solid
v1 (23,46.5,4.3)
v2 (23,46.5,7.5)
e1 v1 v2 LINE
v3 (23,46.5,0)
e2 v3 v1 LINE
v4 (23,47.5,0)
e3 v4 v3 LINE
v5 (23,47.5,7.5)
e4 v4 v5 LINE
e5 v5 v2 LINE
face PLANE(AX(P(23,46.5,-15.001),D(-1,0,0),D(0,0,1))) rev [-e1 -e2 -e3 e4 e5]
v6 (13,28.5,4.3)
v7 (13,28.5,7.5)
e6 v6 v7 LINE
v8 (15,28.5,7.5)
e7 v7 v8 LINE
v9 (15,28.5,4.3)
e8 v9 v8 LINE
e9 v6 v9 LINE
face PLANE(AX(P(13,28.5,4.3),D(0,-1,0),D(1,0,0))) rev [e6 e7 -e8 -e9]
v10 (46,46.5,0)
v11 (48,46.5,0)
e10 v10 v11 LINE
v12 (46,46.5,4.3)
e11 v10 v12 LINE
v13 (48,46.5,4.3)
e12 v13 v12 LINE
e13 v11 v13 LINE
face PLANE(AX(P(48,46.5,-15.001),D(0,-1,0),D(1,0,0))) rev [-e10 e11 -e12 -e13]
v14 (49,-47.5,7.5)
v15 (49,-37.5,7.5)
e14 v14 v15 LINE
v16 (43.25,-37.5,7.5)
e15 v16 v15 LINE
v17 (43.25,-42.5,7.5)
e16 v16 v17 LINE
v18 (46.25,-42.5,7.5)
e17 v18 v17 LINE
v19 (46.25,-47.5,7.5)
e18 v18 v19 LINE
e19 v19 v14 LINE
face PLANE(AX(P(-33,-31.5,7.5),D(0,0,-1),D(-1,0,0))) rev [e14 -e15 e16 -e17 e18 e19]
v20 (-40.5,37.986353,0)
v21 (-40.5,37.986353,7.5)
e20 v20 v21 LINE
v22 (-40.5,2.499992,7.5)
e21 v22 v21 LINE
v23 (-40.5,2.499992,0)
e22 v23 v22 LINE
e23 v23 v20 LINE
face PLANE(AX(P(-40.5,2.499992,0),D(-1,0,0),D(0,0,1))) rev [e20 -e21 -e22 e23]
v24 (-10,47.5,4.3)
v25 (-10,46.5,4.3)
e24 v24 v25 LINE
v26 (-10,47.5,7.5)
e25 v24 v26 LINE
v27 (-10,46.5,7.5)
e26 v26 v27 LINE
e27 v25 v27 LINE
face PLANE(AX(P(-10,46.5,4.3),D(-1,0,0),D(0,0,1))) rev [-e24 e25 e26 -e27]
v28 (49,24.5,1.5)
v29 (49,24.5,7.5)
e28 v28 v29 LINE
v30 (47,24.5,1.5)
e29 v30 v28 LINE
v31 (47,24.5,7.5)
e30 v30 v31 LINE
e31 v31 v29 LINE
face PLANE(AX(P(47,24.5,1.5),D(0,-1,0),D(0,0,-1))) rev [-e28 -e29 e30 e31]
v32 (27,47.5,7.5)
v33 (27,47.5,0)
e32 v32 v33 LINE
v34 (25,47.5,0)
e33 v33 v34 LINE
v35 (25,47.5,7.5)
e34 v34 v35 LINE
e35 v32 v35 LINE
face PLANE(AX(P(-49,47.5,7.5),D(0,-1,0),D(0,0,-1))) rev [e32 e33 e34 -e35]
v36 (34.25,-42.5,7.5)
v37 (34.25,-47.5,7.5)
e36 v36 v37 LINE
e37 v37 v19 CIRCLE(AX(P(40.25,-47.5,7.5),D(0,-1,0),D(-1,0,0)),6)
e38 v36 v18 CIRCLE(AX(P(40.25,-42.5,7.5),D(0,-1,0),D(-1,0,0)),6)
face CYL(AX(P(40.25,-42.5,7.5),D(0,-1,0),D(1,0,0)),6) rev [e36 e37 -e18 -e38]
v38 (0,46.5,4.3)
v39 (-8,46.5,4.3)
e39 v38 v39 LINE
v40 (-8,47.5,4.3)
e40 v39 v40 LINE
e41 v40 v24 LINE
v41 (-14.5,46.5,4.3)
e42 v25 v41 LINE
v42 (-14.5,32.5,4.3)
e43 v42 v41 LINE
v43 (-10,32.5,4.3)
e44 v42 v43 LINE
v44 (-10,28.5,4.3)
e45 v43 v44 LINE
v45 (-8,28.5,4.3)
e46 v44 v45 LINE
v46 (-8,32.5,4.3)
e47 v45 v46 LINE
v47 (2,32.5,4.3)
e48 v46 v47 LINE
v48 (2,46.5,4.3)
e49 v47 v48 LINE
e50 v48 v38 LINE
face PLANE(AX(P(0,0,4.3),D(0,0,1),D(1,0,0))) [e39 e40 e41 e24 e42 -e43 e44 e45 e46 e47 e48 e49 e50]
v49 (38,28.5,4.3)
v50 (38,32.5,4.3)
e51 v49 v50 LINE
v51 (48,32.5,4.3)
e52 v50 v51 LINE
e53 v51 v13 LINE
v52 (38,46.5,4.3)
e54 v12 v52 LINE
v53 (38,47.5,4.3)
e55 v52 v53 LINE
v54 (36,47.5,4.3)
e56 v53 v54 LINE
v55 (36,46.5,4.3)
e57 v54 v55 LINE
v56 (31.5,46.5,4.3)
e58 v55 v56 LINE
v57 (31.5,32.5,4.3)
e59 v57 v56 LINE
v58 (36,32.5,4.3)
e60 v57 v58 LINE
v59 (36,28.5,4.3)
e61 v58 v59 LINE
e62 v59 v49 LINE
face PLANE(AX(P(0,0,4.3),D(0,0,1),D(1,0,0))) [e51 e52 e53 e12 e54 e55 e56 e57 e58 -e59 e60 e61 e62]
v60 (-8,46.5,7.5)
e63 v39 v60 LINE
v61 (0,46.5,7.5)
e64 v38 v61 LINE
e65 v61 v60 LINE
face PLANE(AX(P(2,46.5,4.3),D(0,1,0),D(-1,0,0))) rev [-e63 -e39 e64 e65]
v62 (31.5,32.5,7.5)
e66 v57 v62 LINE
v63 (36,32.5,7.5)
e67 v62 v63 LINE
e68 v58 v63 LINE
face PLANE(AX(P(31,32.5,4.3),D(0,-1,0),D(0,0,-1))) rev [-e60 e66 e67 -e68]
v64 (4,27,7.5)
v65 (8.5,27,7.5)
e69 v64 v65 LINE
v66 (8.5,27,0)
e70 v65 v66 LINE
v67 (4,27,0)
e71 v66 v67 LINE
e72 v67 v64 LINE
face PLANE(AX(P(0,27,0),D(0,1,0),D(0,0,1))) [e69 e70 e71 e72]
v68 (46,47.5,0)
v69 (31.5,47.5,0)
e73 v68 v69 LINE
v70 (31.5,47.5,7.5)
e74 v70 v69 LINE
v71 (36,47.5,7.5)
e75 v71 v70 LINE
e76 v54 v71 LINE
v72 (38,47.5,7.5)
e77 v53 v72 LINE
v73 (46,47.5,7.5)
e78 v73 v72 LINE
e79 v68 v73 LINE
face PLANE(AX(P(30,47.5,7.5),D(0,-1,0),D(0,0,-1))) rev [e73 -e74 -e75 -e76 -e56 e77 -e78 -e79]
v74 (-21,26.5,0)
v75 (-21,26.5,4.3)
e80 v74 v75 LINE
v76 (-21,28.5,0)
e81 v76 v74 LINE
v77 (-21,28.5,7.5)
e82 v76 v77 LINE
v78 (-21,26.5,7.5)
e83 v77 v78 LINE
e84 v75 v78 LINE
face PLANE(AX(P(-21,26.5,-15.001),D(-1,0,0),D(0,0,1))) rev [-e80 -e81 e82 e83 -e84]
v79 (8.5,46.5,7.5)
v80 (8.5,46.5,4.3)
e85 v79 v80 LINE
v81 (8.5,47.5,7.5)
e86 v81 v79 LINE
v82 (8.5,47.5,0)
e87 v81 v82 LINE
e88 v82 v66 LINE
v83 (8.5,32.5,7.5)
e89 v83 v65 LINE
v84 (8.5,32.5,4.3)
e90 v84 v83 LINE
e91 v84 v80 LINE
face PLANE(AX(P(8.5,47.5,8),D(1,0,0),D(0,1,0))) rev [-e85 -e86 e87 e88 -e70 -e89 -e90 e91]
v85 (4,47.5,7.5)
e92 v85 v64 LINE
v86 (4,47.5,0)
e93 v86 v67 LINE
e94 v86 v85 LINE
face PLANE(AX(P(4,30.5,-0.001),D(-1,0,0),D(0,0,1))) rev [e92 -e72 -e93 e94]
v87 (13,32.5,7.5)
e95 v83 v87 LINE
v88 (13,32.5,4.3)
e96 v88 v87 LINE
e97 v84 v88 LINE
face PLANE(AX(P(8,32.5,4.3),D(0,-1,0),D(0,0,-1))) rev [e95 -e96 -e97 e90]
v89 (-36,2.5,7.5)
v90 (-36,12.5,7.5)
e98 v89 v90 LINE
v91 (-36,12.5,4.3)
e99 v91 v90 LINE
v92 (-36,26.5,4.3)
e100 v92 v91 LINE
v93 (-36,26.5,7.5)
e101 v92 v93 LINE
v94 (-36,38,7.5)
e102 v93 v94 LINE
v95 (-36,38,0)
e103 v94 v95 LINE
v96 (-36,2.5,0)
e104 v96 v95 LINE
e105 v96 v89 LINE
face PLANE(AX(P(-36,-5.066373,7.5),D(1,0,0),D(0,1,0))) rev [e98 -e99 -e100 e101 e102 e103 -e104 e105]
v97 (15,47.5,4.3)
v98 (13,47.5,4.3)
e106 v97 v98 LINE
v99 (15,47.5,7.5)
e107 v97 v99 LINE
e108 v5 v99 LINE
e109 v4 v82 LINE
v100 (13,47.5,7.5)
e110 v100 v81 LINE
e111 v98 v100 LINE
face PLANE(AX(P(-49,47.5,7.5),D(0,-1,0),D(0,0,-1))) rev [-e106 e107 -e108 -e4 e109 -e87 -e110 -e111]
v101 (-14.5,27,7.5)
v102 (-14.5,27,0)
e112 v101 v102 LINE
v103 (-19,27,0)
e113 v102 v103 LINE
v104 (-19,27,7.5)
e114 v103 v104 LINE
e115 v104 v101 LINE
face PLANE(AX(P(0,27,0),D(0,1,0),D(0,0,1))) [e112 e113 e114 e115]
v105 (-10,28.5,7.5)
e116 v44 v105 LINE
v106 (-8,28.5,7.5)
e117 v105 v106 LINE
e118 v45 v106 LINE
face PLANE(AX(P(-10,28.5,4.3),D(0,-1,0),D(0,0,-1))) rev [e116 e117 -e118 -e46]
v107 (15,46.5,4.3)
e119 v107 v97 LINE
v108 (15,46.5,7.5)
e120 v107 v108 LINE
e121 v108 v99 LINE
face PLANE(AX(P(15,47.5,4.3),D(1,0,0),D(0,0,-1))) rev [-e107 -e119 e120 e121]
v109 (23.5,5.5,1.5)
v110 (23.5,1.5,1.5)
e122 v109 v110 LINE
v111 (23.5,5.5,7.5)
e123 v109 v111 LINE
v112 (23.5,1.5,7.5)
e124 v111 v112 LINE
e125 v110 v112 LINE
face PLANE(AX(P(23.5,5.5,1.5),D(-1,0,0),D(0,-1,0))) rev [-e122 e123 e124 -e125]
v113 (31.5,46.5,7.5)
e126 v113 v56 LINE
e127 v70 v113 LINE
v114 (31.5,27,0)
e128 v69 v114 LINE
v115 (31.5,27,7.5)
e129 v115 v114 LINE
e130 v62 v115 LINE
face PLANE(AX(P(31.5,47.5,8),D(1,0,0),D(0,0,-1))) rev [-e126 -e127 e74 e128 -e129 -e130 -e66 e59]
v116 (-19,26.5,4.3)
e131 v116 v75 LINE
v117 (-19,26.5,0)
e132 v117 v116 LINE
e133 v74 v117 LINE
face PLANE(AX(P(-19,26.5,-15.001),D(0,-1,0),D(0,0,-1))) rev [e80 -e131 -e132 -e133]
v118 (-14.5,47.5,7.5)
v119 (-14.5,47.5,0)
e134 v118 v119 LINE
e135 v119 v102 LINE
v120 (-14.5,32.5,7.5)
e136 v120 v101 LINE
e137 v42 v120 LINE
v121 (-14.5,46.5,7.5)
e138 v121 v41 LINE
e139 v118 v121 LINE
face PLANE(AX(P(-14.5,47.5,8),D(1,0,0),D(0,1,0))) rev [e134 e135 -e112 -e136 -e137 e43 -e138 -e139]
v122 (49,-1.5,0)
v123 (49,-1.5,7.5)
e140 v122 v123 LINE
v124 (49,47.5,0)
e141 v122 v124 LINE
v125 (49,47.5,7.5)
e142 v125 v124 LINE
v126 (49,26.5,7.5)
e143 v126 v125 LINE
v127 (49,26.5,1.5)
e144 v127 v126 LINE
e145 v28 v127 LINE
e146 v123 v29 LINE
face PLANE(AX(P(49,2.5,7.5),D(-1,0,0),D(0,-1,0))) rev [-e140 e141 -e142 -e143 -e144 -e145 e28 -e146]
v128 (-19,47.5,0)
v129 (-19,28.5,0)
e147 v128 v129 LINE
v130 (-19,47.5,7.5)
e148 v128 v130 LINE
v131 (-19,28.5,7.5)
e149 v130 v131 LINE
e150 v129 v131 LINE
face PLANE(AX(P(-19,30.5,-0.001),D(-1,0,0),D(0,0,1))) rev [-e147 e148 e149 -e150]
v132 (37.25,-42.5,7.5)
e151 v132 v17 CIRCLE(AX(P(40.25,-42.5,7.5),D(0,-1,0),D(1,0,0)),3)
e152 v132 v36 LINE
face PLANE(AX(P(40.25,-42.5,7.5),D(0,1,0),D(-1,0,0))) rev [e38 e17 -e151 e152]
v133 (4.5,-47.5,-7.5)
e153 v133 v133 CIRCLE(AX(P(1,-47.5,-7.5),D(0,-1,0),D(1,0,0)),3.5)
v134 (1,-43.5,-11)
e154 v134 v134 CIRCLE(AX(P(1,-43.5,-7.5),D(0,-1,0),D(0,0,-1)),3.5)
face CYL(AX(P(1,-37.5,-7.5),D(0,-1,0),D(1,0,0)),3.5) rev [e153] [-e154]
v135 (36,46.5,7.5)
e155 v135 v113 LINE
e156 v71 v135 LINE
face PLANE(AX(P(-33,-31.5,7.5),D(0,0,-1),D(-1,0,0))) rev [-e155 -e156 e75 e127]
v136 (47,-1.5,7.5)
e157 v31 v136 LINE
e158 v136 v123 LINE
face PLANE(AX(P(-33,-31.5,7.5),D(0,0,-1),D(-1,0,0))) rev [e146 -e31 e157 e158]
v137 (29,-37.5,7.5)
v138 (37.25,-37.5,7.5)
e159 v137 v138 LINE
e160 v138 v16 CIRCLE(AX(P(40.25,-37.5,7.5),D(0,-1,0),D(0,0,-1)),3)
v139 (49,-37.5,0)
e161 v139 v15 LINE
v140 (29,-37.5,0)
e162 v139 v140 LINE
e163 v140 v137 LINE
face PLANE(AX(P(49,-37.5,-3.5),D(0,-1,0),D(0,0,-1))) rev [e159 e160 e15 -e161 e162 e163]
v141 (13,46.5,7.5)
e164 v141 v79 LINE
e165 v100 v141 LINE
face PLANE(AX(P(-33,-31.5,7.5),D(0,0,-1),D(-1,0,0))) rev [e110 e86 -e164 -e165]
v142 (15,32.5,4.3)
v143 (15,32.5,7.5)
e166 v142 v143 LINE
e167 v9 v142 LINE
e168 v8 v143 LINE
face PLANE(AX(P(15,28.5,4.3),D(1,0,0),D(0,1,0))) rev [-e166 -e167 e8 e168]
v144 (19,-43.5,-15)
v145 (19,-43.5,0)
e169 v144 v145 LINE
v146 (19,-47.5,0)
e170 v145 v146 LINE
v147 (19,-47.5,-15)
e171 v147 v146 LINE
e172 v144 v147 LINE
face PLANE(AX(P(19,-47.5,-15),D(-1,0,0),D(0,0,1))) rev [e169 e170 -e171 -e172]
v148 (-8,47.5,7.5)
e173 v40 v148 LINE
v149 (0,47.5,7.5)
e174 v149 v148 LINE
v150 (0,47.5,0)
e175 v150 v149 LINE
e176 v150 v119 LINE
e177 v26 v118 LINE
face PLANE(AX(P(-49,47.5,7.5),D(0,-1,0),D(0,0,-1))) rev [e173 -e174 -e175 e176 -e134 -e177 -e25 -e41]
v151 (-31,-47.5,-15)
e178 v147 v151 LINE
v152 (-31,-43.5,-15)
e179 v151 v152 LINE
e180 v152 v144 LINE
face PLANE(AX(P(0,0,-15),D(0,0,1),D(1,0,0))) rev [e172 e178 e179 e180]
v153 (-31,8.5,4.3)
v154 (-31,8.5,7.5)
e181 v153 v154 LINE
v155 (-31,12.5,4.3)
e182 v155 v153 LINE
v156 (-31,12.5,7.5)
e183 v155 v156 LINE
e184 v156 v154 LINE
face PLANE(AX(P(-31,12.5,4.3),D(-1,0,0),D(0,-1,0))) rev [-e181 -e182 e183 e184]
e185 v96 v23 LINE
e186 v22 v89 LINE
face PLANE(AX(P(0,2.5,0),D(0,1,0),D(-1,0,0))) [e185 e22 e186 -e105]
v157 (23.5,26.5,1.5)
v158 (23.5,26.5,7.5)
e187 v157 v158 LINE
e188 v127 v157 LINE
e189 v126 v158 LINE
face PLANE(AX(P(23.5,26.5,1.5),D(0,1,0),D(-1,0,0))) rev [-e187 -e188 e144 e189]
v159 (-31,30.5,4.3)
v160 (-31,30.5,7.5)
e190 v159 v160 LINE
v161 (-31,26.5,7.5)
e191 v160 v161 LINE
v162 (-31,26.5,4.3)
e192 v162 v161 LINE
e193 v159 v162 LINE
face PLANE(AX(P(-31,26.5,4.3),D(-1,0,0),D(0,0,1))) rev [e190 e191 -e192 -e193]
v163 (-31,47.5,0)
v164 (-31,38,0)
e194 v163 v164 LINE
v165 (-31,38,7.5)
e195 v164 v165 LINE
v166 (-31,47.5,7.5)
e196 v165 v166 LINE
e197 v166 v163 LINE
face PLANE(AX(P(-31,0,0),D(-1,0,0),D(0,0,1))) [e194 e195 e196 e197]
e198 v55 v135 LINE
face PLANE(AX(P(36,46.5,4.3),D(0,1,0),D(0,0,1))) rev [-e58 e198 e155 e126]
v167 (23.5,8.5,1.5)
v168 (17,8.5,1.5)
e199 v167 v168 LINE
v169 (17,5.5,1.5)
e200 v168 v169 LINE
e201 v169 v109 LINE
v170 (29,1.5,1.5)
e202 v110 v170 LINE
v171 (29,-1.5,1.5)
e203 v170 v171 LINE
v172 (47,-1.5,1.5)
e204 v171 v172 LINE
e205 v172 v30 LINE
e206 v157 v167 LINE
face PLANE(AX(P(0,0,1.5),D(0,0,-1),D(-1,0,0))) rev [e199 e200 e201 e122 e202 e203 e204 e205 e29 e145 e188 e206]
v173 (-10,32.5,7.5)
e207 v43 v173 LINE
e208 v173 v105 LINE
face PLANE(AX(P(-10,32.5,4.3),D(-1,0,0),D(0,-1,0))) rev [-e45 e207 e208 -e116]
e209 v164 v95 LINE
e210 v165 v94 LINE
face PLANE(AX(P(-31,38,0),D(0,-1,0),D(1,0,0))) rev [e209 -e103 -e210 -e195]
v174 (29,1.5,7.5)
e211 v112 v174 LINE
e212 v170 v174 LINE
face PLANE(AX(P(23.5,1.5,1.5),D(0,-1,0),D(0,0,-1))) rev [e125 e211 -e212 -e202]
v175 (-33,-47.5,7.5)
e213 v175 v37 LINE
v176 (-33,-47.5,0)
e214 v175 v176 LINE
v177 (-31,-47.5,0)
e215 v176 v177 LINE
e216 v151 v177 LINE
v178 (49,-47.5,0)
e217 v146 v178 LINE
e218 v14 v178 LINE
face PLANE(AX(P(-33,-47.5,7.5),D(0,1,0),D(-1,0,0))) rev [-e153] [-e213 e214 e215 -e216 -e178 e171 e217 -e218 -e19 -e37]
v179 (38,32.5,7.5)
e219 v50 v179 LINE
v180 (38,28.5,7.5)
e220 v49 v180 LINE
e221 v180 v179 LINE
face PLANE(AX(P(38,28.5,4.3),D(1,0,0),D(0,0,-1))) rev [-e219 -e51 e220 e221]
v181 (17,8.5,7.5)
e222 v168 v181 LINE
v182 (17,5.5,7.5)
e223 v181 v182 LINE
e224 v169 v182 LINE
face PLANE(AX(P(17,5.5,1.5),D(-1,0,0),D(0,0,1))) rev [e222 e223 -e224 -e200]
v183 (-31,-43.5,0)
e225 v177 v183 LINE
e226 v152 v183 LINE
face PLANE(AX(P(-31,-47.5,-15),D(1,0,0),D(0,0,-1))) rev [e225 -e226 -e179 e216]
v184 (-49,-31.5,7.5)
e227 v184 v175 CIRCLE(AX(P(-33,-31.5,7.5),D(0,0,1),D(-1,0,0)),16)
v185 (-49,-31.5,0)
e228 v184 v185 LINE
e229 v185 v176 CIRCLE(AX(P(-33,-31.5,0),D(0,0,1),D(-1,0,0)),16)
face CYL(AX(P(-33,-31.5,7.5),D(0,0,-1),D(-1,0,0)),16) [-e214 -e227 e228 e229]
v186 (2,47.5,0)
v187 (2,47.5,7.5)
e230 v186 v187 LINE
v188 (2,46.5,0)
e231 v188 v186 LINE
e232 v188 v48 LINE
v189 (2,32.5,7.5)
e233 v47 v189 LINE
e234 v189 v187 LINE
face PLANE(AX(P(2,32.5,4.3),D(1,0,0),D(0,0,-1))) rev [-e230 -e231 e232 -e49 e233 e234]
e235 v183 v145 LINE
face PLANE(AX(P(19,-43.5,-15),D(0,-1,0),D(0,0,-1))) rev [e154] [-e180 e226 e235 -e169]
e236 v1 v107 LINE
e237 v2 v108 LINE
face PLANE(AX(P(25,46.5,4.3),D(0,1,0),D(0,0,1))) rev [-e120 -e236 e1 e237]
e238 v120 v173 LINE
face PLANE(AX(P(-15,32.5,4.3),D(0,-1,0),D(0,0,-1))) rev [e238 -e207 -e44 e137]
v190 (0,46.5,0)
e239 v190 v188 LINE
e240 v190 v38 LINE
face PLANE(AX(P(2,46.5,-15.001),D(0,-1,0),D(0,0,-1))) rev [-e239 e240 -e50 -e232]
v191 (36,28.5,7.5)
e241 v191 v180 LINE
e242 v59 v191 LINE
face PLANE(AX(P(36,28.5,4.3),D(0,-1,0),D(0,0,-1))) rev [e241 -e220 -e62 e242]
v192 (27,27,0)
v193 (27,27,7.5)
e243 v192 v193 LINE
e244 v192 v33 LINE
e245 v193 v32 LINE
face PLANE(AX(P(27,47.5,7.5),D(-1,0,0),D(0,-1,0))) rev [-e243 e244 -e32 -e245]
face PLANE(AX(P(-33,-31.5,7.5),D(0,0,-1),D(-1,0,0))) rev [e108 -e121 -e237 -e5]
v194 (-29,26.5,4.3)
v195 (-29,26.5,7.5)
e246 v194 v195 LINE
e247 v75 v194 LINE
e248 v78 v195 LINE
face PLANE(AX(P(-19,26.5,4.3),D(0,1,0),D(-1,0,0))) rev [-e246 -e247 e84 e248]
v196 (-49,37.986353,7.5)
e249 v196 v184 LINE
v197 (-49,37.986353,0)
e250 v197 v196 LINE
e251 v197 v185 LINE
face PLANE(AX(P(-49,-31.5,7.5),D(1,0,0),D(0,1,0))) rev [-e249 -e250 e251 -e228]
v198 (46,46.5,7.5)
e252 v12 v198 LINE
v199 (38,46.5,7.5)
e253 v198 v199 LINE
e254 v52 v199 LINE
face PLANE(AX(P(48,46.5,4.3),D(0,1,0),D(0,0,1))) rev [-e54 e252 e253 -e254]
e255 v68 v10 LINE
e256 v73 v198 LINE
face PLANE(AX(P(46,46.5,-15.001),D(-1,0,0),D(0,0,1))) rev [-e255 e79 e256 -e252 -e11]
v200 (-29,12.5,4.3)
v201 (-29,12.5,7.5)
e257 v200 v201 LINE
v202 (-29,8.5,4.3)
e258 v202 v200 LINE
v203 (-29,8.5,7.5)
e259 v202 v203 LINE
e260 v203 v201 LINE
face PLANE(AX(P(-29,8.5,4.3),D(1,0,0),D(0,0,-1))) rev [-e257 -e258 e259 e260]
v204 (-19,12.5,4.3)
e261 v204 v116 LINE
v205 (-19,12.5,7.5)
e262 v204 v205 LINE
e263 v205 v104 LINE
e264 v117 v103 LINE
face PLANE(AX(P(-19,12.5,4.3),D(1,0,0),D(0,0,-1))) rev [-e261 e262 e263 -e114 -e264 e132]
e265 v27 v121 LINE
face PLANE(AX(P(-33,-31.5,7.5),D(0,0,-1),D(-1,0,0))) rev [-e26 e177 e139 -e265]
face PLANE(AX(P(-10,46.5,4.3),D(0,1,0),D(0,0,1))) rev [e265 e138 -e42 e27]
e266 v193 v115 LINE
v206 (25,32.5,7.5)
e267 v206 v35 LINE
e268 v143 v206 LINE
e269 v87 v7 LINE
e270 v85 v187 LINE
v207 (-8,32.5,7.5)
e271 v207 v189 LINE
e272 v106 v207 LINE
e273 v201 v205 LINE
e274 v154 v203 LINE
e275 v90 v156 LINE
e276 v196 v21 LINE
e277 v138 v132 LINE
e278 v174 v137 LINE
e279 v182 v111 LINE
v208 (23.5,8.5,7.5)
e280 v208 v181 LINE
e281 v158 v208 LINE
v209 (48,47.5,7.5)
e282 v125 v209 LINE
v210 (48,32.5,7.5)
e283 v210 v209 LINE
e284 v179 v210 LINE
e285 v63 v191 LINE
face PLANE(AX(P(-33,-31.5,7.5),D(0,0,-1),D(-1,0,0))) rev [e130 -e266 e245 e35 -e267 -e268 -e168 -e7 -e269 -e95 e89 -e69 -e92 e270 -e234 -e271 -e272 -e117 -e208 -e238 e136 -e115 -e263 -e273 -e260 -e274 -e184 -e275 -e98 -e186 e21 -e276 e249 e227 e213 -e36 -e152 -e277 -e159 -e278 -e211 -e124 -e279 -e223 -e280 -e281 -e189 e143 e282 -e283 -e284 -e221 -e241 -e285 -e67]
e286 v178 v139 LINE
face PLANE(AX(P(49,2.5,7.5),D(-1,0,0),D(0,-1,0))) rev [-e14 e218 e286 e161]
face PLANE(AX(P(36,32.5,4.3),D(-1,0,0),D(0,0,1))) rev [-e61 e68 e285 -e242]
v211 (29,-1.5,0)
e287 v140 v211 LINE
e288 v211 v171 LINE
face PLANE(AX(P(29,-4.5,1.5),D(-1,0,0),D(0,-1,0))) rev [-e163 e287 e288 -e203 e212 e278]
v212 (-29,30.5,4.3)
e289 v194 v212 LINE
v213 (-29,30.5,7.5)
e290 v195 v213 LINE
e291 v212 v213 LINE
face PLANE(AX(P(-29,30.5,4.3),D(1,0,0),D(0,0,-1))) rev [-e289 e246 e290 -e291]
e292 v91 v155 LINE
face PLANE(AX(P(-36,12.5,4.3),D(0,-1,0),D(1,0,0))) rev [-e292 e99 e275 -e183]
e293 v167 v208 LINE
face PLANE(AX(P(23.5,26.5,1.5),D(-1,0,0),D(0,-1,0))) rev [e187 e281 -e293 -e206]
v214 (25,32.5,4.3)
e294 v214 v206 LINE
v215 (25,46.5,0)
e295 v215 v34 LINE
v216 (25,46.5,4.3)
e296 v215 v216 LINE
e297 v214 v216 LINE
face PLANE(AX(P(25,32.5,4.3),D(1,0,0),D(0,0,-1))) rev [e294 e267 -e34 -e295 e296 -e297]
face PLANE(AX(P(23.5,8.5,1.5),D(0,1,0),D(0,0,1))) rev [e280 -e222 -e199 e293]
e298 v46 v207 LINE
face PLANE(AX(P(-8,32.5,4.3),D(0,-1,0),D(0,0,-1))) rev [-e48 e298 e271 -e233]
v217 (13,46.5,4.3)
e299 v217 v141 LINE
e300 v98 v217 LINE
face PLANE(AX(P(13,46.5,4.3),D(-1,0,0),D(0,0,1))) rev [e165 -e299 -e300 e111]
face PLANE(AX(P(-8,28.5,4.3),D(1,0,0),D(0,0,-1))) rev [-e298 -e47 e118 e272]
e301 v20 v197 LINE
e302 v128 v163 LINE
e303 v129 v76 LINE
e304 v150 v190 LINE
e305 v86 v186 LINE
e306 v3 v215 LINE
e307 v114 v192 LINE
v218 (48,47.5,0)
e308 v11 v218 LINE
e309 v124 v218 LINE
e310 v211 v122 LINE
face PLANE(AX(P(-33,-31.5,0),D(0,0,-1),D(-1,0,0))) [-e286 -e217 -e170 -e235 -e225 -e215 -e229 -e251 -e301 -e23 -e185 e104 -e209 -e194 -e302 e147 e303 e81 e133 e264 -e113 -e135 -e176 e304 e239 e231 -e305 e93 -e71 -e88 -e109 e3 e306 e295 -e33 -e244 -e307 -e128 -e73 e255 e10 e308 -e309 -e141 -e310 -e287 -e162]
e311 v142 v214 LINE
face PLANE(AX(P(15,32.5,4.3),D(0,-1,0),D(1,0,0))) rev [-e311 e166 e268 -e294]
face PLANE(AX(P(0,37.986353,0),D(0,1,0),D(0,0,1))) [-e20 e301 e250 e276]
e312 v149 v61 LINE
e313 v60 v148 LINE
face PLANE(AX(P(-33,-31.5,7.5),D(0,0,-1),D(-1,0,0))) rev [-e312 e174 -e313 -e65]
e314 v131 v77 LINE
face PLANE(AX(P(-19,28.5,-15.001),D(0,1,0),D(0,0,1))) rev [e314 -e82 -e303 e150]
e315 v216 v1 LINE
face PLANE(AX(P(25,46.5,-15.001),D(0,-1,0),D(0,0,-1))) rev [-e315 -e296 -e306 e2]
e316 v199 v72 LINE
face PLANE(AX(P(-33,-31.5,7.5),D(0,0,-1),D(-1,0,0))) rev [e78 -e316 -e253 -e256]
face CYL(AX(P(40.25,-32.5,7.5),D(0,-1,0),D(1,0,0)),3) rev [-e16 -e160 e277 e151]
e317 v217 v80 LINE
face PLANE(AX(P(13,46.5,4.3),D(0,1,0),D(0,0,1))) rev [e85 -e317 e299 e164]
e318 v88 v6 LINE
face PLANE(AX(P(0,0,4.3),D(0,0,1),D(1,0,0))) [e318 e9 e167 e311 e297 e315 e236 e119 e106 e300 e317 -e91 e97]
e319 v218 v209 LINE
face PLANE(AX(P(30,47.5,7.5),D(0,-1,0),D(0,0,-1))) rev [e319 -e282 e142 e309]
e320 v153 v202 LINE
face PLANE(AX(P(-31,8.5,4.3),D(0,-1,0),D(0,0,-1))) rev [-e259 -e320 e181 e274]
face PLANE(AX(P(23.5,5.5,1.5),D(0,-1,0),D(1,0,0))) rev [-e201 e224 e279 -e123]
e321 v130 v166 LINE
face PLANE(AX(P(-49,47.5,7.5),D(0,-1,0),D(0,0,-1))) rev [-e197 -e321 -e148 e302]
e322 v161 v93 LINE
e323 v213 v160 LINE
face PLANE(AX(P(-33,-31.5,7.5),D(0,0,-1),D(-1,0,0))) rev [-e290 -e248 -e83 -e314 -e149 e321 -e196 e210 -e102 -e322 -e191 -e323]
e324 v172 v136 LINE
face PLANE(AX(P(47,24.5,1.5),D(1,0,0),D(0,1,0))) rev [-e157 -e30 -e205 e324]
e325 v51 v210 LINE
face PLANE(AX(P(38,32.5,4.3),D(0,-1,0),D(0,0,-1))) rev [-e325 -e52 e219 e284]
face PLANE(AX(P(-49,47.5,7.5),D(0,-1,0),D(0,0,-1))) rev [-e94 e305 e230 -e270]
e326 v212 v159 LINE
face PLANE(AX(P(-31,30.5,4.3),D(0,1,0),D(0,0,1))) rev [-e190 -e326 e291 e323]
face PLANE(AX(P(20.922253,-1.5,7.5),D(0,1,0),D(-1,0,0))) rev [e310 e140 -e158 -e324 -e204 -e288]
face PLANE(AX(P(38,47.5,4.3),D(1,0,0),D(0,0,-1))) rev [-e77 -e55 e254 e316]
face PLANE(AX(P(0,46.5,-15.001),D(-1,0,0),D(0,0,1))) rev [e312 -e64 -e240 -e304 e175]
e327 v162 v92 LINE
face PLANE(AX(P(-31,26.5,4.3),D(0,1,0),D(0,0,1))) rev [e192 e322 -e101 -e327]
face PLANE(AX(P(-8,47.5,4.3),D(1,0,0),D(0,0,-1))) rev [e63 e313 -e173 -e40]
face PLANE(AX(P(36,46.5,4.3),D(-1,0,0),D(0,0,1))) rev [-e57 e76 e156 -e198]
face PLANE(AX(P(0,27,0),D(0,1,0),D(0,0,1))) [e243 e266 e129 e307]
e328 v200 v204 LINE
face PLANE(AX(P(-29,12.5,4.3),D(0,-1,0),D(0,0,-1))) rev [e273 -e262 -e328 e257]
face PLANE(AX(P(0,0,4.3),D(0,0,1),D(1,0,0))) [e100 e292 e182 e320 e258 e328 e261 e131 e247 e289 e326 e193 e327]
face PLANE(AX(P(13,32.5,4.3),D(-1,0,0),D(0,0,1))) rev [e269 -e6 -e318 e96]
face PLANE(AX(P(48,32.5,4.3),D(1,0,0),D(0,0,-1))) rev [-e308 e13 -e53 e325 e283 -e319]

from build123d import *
from OCP.BRepAlgoAPI import BRepAlgoAPI_Cut
from OCP.TopTools import TopTools_ListOfShape
from build123d.topology import SkipClean

# Parameters (mm, degrees)
BOSS_EXTRUDE1_DEPTH = 7.5
CUT_EXTRUDE1_DEPTH  = 3.2
CUT_EXTRUDE4_REACH  = 70.655
SKETCH5_W           = 3
SKETCH5_H           = 17
CUT_EXTRUDE5_REACH  = 70.655
SKETCH8_W           = 12
SKETCH8_H           = 37
CUT_EXTRUDE6_DEPTH  = 3.2
SKETCH10_W          = 10
SKETCH10_H          = 7.5
BOSS_EXTRUDE2_DEPTH = 27.486353186
SKETCH11_W          = 3
SKETCH11_H          = 7.5
CUT_EXTRUDE7_DEPTH  = 3.5
SKETCH12_W          = 2
SKETCH12_H          = 7.5
CUT_EXTRUDE8_DEPTH  = 4
SKETCH13_W          = 2
SKETCH13_H          = 7.5
CUT_EXTRUDE9_DEPTH  = 4
SKETCH14_W          = 7.5
SKETCH14_H          = 9.5
CUT_EXTRUDE10_DEPTH = 6
SKETCH16_W          = 1.5
SKETCH16_H          = 7.5
CUT_EXTRUDE12_DEPTH = 35.486360958
CUT_EXTRUDE13_DEPTH = 6
SKETCH19_W          = 17.5
SKETCH19_H          = 32
BOSS_EXTRUDE3_DEPTH = 7.5
CUT_EXTRUDE14_DEPTH = 6
SKETCH20_W          = 18
SKETCH20_H          = 6
CUT_EXTRUDE15_DEPTH = 6
SKETCH21_W          = 20
SKETCH21_H          = 33
CUT_EXTRUDE16_DEPTH = 11
CUT_EXTRUDE17_DEPTH = 5
CUT_EXTRUDE18_DEPTH = 10
SKETCH23_W          = 50
SKETCH23_H          = 4
BOSS_EXTRUDE4_DEPTH = 15
SKETCH25_R          = 3.5
CUT_EXTRUDE19_DEPTH = 10
SKETCH26_W          = 1.5
SKETCH26_H          = 20.5
CUT_EXTRUDE20_DEPTH = 8
SKETCH27_W          = 1.5
SKETCH27_H          = 20.5
CUT_EXTRUDE21_DEPTH = 8
SKETCH28_W          = 1.5
SKETCH28_H          = 20.5
CUT_EXTRUDE22_DEPTH = 8
CUT_EXTRUDE25_REACH = 73.857
SKETCH35_W          = 2
SKETCH35_H          = 2
SKETCH35_H_2        = 1
SKETCH36_W          = 1
SKETCH36_H          = 7.5
CUT_EXTRUDE26_DEPTH = 35.5
SKETCH37_W          = 7.5
SKETCH37_H          = 3
CUT_EXTRUDE27_DEPTH = 20


with BuildPart() as part:
    # Sketch1 → Boss-Extrude1 (new body)
    with BuildSketch(Plane.XY):
        with BuildLine():
            Line((-33, -47.5), (49, -47.5))
            Line((49, -47.5), (49, -29.5))
            Line((49, -29.5), (31.5, -29.5))
            Line((31.5, -29.5), (31.5, 2.5))
            Line((31.5, 2.5), (49, 2.5))
            Line((49, 2.5), (49, 47.5))
            Line((49, 47.5), (30, 47.5))
            Line((30, 47.5), (30, 30.5))
            Line((30, 30.5), (27, 30.5))
            Line((27, 30.5), (27, 47.5))
            Line((27, 47.5), (-49, 47.5))
            Line((-49, 47.5), (-49, -31.5))
            ThreePointArc((-49, -31.5), (-44.313708499, -42.813708499), (-33, -47.5))
        make_face()
    extrude(amount=BOSS_EXTRUDE1_DEPTH)

    # Sketch2 → Cut-Extrude1 (cut)
    with BuildSketch(Plane.XY.offset(7.5)):
        Polygon((30, 40), (31, 40), (31, 32.5), (36, 32.5), (36, 28.5), (38, 28.5), (38, 32.5), (48, 32.5), (48, 46.5), (38, 46.5), (38, 47.5), (36, 47.5), (36, 46.5), (31, 46.5), (31, 45), (30, 45), align=None)
        Polygon((-16, 40), (-15, 40), (-15, 32.5), (-10, 32.5), (-10, 28.5), (-8, 28.5), (-8, 32.5), (2, 32.5), (2, 46.5), (-8, 46.5), (-8, 47.5), (-10, 47.5), (-10, 46.5), (-15, 46.5), (-15, 45), (-16, 45), align=None)
        Polygon((7, 40), (8, 40), (8, 32.5), (13, 32.5), (13, 28.5), (15, 28.5), (15, 32.5), (25, 32.5), (25, 46.5), (15, 46.5), (15, 47.5), (13, 47.5), (13, 46.5), (8, 46.5), (8, 45), (7, 45), align=None)
    extrude(amount=-CUT_EXTRUDE1_DEPTH, mode=Mode.SUBTRACT)

    # Sketch5 → Cut-Extrude4 (cut, up to next)
    with BuildSketch(Plane.XY.offset(7.5), mode=Mode.PRIVATE) as cut_extrude4_sk1:
        with Locations((5.5, 39)):
            Rectangle(SKETCH5_W, SKETCH5_H)
    cut_extrude4_tool1 = extrude(cut_extrude4_sk1.sketch, amount=-CUT_EXTRUDE4_REACH, mode=Mode.PRIVATE) & part.part
    # Sketch5 → Cut-Extrude4 (cut, up to next)
    with BuildSketch(Plane.XY.offset(7.5), mode=Mode.PRIVATE) as cut_extrude4_sk2:
        with Locations((-17.5, 39)):
            Rectangle(SKETCH5_W, SKETCH5_H)
    cut_extrude4_tool2 = extrude(cut_extrude4_sk2.sketch, amount=-CUT_EXTRUDE4_REACH, mode=Mode.PRIVATE) & part.part
    add(cut_extrude4_tool1.solids().sort_by_distance((5.5, 39, 7.5))[0], mode=Mode.SUBTRACT)
    add(cut_extrude4_tool2.solids().sort_by_distance((-17.5, 39, 7.5))[0], mode=Mode.SUBTRACT)

    # Sketch8 → Cut-Extrude5 (cut, up to next)
    with BuildSketch(Plane.XY.offset(7.5), mode=Mode.PRIVATE) as cut_extrude5_sk1:
        with Locations((-43, 29)):
            Rectangle(SKETCH8_W, SKETCH8_H)
    cut_extrude5_tool1 = extrude(cut_extrude5_sk1.sketch, amount=-CUT_EXTRUDE5_REACH, mode=Mode.PRIVATE) & part.part
    add(cut_extrude5_tool1.solids().sort_by_distance((-43, 29, 7.5))[0], mode=Mode.SUBTRACT)

    # Sketch9 → Cut-Extrude6 (cut)
    with BuildSketch(Plane.XY.offset(7.5)):
        Polygon((-37, 20), (-36, 20), (-36, 12.5), (-31, 12.5), (-31, 8.5), (-29, 8.5), (-29, 12.5), (-19, 12.5), (-19, 26.5), (-29, 26.5), (-29, 30.5), (-31, 30.5), (-31, 26.5), (-36, 26.5), (-36, 25), (-37, 25), align=None)
    extrude(amount=-CUT_EXTRUDE6_DEPTH, mode=Mode.SUBTRACT)

    # Sketch10 → Boss-Extrude2 (add)
    with BuildSketch(Plane(origin=(0, 10.5, 0), x_dir=(1, 0, 0), z_dir=(0, 1, 0))):
        with Locations((-44, -3.75)):
            Rectangle(SKETCH10_W, SKETCH10_H)
    extrude(amount=BOSS_EXTRUDE2_DEPTH)

    # Sketch11 → Cut-Extrude7 (cut)
    with BuildSketch(Plane(origin=(0, 30.5, 0), x_dir=(1, 0, 0), z_dir=(0, 1, 0))):
        with Locations((-17.5, -3.75)):
            Rectangle(SKETCH11_W, SKETCH11_H)
        with Locations((5.5, -3.75)):
            Rectangle(SKETCH11_W, SKETCH11_H)
        with Locations((28.5, -3.75)):
            Rectangle(SKETCH11_W, SKETCH11_H)
    extrude(amount=-CUT_EXTRUDE7_DEPTH, mode=Mode.SUBTRACT)

    # Sketch12 → Cut-Extrude8 (cut)
    with BuildSketch(Plane(origin=(0, 10.5, 0), x_dir=(1, 0, 0), z_dir=(0, 1, 0))):
        with Locations((-38, -3.75)):
            Rectangle(SKETCH12_W, SKETCH12_H)
    extrude(amount=-CUT_EXTRUDE8_DEPTH, mode=Mode.SUBTRACT)

    # Sketch13 → Cut-Extrude9 (cut)
    with BuildSketch(Plane(origin=(0, 6.5, 0), x_dir=(1, 0, 0), z_dir=(0, 1, 0))):
        with Locations((-38, -3.75)):
            Rectangle(SKETCH13_W, SKETCH13_H)
    extrude(amount=-CUT_EXTRUDE9_DEPTH, mode=Mode.SUBTRACT)

    # Sketch14 → Cut-Extrude10 (cut)
    with BuildSketch(Plane.ZY.offset(37)):
        with Locations((3.75, 42.75)):
            Rectangle(SKETCH14_W, SKETCH14_H)
    extrude(amount=-CUT_EXTRUDE10_DEPTH, mode=Mode.SUBTRACT)


with BuildPart() as cut_extrude12_tool:
    # Sketch16 → Cut-Extrude12 (new body)
    with BuildSketch(Plane(origin=(0, 37.986353186, 0), x_dir=(1, 0, 0), z_dir=(0, 1, 0))):
        with Locations((-39.75, -3.75)):
            Rectangle(SKETCH16_W, SKETCH16_H)
    extrude(amount=-CUT_EXTRUDE12_DEPTH)


with BuildPart() as part_1:
    add(part.part)

    # Cut-Extrude12: cut by cut_extrude12_tool, with a tolerance
    cut_extrude12_stock = TopTools_ListOfShape()
    cut_extrude12_stock.Append(part_1.part.wrapped)
    cut_extrude12_tools = TopTools_ListOfShape()
    cut_extrude12_tools.Append(cut_extrude12_tool.part.wrapped)
    cut_extrude12_cut = BRepAlgoAPI_Cut()
    cut_extrude12_cut.SetArguments(cut_extrude12_stock)
    cut_extrude12_cut.SetTools(cut_extrude12_tools)
    cut_extrude12_cut.SetFuzzyValue(0.00001)
    cut_extrude12_cut.Build()
    add(Compound.cast(cut_extrude12_cut.Shape()).solids(), mode=Mode.REPLACE)

    # Sketch18 → Cut-Extrude13 (cut)
    with SkipClean():  # the faces are left unmerged after this step: merging them gives an invalid solid
        with BuildSketch(Plane.XY.offset(7.5)):
            Polygon((23.5, 5.5), (23.5, 1.5), (47, 1.5), (47, 24.5), (49, 24.5), (49, 26.5), (47, 26.5), (23.5, 26.5), (23.5, 8.5), (17, 8.5), (17, 5.5), align=None)
        extrude(amount=-CUT_EXTRUDE13_DEPTH, mode=Mode.SUBTRACT)

    # Sketch19 → Boss-Extrude3 (add)
    with SkipClean():  # the faces are left unmerged after this step: merging them gives an invalid solid
        with BuildSketch(Plane(origin=(0, 0, 0), x_dir=(-1, 0, 0), z_dir=(0, 0, -1))):
            with Locations((-40.25, -13.5)):
                Rectangle(SKETCH19_W, SKETCH19_H)
        extrude(amount=-BOSS_EXTRUDE3_DEPTH)

    # Sketch18<2> → Cut-Extrude14 (cut)
    with SkipClean():  # the faces are left unmerged after this step: merging them gives an invalid solid
        with BuildSketch(Plane.XY.offset(7.5)):
            Polygon((23.5, 5.5), (23.5, 1.5), (47, 1.5), (47, 24.5), (49, 24.5), (49, 26.5), (47, 26.5), (23.5, 26.5), (23.5, 8.5), (17, 8.5), (17, 5.5), align=None)
        extrude(amount=-CUT_EXTRUDE14_DEPTH, mode=Mode.SUBTRACT)

    # Sketch20 → Cut-Extrude15 (cut)
    with SkipClean():  # the faces are left unmerged after this step: merging them gives an invalid solid
        with BuildSketch(Plane.XY.offset(7.5)):
            with Locations((38, -1.5)):
                Rectangle(SKETCH20_W, SKETCH20_H)
        extrude(amount=-CUT_EXTRUDE15_DEPTH, mode=Mode.SUBTRACT)

    # Sketch21 → Cut-Extrude16 (cut)
    with SkipClean():  # the faces are left unmerged after this step: merging them gives an invalid solid
        with BuildSketch(Plane.XY.offset(7.5)):
            with Locations((39, -21)):
                Rectangle(SKETCH21_W, SKETCH21_H)
        extrude(amount=-CUT_EXTRUDE16_DEPTH, mode=Mode.SUBTRACT)

    # Sketch3 → Cut-Extrude17 (cut)
    with SkipClean():  # the faces are left unmerged after this step: merging them gives an invalid solid
        with BuildSketch(Plane.XZ.offset(47.5)):
            with BuildLine():
                Line((34.25, 7.5), (46.25, 7.5))
                ThreePointArc((46.25, 7.5), (40.25, 1.5), (34.25, 7.5))
            make_face()
        extrude(amount=-CUT_EXTRUDE17_DEPTH, mode=Mode.SUBTRACT)

    # Sketch22 → Cut-Extrude18 (cut)
    with SkipClean():  # the faces are left unmerged after this step: merging them gives an invalid solid
        with BuildSketch(Plane.XZ.offset(42.5)):
            with BuildLine():
                Line((37.25, 7.5), (43.25, 7.5))
                ThreePointArc((43.25, 7.5), (40.25, 4.5), (37.25, 7.5))
            make_face()
        extrude(amount=-CUT_EXTRUDE18_DEPTH, mode=Mode.SUBTRACT)

    # Sketch23 → Boss-Extrude4 (add)
    with SkipClean():  # the faces are left unmerged after this step: merging them gives an invalid solid
        with BuildSketch(Plane(origin=(0, 0, 0), x_dir=(-1, 0, 0), z_dir=(0, 0, -1))):
            with Locations((6, -45.5)):
                Rectangle(SKETCH23_W, SKETCH23_H)
        extrude(amount=BOSS_EXTRUDE4_DEPTH)

    # Sketch25 → Cut-Extrude19 (cut)
    with SkipClean():  # the faces are left unmerged after this step: merging them gives an invalid solid
        with BuildSketch(Plane(origin=(0, -47.5, 0), x_dir=(-1, 0, 0), z_dir=(0, -1, 0))):
            with Locations(Location((-1, 7.5, 0), (0, 0, 180))):
                Circle(SKETCH25_R)
        extrude(amount=-CUT_EXTRUDE19_DEPTH, mode=Mode.SUBTRACT)

    # Sketch26 → Cut-Extrude20 (cut)
    with SkipClean():  # the faces are left unmerged after this step: merging them gives an invalid solid
        with BuildSketch(Plane(origin=(0, 0, 0), x_dir=(-1, 0, 0), z_dir=(0, 0, -1))):
            with Locations((-30.75, 37.25)):
                Rectangle(SKETCH26_W, SKETCH26_H)
        extrude(amount=-CUT_EXTRUDE20_DEPTH, mode=Mode.SUBTRACT)

    # Sketch27 → Cut-Extrude21 (cut)
    with SkipClean():  # the faces are left unmerged after this step: merging them gives an invalid solid
        with BuildSketch(Plane(origin=(0, 0, 0), x_dir=(-1, 0, 0), z_dir=(0, 0, -1))):
            with Locations((-7.75, 37.25)):
                Rectangle(SKETCH27_W, SKETCH27_H)
        extrude(amount=-CUT_EXTRUDE21_DEPTH, mode=Mode.SUBTRACT)

    # Sketch28 → Cut-Extrude22 (cut)
    with SkipClean():  # the faces are left unmerged after this step: merging them gives an invalid solid
        with BuildSketch(Plane(origin=(0, 0, 0), x_dir=(-1, 0, 0), z_dir=(0, 0, -1))):
            with Locations((15.25, 37.25)):
                Rectangle(SKETCH28_W, SKETCH28_H)
        extrude(amount=-CUT_EXTRUDE22_DEPTH, mode=Mode.SUBTRACT)

    # Sketch35 → Cut-Extrude25 (cut, up to next)
    with BuildSketch(Plane.XY.offset(7.5), mode=Mode.PRIVATE) as cut_extrude25_sk1:
        with Locations((-20, 27.5)):
            Rectangle(SKETCH35_W, SKETCH35_H)
    cut_extrude25_tool1 = extrude(cut_extrude25_sk1.sketch, amount=-CUT_EXTRUDE25_REACH, mode=Mode.PRIVATE) & part_1.part
    # Sketch35 → Cut-Extrude25 (cut, up to next)
    with BuildSketch(Plane.XY.offset(7.5), mode=Mode.PRIVATE) as cut_extrude25_sk2:
        with Locations((1, 47)):
            Rectangle(SKETCH35_W, SKETCH35_H_2)
    cut_extrude25_tool2 = extrude(cut_extrude25_sk2.sketch, amount=-CUT_EXTRUDE25_REACH, mode=Mode.PRIVATE) & part_1.part
    # Sketch35 → Cut-Extrude25 (cut, up to next)
    with BuildSketch(Plane.XY.offset(7.5), mode=Mode.PRIVATE) as cut_extrude25_sk3:
        with Locations((24, 47)):
            Rectangle(SKETCH35_W, SKETCH35_H_2)
    cut_extrude25_tool3 = extrude(cut_extrude25_sk3.sketch, amount=-CUT_EXTRUDE25_REACH, mode=Mode.PRIVATE) & part_1.part
    # Sketch35 → Cut-Extrude25 (cut, up to next)
    with BuildSketch(Plane.XY.offset(7.5), mode=Mode.PRIVATE) as cut_extrude25_sk4:
        with Locations((47, 47)):
            Rectangle(SKETCH35_W, SKETCH35_H_2)
    cut_extrude25_tool4 = extrude(cut_extrude25_sk4.sketch, amount=-CUT_EXTRUDE25_REACH, mode=Mode.PRIVATE) & part_1.part
    add(cut_extrude25_tool1.solids().sort_by_distance((-20, 27.5, 7.5))[0], mode=Mode.SUBTRACT)
    add(cut_extrude25_tool2.solids().sort_by_distance((1, 47, 7.5))[0], mode=Mode.SUBTRACT)
    add(cut_extrude25_tool3.solids().sort_by_distance((24, 47, 7.5))[0], mode=Mode.SUBTRACT)
    add(cut_extrude25_tool4.solids().sort_by_distance((47, 47, 7.5))[0], mode=Mode.SUBTRACT)

    # Sketch36 → Cut-Extrude26 (cut)
    with SkipClean():  # the faces are left unmerged after this step: merging them gives an invalid solid
        with BuildSketch(Plane(origin=(0, 38, 0), x_dir=(1, 0, 0), z_dir=(0, 1, 0))):
            with Locations((-36.5, -3.75)):
                Rectangle(SKETCH36_W, SKETCH36_H)
        extrude(amount=-CUT_EXTRUDE26_DEPTH, mode=Mode.SUBTRACT)

    # Sketch37 → Cut-Extrude27 (cut)
    with SkipClean():  # the faces are left unmerged after this step: merging them gives an invalid solid
        with BuildSketch(Plane(origin=(49, 0, 0), x_dir=(0, 0, -1), z_dir=(1, 0, 0))):
            with Locations((-3.75, -3)):
                Rectangle(SKETCH37_W, SKETCH37_H)
        extrude(amount=-CUT_EXTRUDE27_DEPTH, mode=Mode.SUBTRACT)


solid = part_1.part
